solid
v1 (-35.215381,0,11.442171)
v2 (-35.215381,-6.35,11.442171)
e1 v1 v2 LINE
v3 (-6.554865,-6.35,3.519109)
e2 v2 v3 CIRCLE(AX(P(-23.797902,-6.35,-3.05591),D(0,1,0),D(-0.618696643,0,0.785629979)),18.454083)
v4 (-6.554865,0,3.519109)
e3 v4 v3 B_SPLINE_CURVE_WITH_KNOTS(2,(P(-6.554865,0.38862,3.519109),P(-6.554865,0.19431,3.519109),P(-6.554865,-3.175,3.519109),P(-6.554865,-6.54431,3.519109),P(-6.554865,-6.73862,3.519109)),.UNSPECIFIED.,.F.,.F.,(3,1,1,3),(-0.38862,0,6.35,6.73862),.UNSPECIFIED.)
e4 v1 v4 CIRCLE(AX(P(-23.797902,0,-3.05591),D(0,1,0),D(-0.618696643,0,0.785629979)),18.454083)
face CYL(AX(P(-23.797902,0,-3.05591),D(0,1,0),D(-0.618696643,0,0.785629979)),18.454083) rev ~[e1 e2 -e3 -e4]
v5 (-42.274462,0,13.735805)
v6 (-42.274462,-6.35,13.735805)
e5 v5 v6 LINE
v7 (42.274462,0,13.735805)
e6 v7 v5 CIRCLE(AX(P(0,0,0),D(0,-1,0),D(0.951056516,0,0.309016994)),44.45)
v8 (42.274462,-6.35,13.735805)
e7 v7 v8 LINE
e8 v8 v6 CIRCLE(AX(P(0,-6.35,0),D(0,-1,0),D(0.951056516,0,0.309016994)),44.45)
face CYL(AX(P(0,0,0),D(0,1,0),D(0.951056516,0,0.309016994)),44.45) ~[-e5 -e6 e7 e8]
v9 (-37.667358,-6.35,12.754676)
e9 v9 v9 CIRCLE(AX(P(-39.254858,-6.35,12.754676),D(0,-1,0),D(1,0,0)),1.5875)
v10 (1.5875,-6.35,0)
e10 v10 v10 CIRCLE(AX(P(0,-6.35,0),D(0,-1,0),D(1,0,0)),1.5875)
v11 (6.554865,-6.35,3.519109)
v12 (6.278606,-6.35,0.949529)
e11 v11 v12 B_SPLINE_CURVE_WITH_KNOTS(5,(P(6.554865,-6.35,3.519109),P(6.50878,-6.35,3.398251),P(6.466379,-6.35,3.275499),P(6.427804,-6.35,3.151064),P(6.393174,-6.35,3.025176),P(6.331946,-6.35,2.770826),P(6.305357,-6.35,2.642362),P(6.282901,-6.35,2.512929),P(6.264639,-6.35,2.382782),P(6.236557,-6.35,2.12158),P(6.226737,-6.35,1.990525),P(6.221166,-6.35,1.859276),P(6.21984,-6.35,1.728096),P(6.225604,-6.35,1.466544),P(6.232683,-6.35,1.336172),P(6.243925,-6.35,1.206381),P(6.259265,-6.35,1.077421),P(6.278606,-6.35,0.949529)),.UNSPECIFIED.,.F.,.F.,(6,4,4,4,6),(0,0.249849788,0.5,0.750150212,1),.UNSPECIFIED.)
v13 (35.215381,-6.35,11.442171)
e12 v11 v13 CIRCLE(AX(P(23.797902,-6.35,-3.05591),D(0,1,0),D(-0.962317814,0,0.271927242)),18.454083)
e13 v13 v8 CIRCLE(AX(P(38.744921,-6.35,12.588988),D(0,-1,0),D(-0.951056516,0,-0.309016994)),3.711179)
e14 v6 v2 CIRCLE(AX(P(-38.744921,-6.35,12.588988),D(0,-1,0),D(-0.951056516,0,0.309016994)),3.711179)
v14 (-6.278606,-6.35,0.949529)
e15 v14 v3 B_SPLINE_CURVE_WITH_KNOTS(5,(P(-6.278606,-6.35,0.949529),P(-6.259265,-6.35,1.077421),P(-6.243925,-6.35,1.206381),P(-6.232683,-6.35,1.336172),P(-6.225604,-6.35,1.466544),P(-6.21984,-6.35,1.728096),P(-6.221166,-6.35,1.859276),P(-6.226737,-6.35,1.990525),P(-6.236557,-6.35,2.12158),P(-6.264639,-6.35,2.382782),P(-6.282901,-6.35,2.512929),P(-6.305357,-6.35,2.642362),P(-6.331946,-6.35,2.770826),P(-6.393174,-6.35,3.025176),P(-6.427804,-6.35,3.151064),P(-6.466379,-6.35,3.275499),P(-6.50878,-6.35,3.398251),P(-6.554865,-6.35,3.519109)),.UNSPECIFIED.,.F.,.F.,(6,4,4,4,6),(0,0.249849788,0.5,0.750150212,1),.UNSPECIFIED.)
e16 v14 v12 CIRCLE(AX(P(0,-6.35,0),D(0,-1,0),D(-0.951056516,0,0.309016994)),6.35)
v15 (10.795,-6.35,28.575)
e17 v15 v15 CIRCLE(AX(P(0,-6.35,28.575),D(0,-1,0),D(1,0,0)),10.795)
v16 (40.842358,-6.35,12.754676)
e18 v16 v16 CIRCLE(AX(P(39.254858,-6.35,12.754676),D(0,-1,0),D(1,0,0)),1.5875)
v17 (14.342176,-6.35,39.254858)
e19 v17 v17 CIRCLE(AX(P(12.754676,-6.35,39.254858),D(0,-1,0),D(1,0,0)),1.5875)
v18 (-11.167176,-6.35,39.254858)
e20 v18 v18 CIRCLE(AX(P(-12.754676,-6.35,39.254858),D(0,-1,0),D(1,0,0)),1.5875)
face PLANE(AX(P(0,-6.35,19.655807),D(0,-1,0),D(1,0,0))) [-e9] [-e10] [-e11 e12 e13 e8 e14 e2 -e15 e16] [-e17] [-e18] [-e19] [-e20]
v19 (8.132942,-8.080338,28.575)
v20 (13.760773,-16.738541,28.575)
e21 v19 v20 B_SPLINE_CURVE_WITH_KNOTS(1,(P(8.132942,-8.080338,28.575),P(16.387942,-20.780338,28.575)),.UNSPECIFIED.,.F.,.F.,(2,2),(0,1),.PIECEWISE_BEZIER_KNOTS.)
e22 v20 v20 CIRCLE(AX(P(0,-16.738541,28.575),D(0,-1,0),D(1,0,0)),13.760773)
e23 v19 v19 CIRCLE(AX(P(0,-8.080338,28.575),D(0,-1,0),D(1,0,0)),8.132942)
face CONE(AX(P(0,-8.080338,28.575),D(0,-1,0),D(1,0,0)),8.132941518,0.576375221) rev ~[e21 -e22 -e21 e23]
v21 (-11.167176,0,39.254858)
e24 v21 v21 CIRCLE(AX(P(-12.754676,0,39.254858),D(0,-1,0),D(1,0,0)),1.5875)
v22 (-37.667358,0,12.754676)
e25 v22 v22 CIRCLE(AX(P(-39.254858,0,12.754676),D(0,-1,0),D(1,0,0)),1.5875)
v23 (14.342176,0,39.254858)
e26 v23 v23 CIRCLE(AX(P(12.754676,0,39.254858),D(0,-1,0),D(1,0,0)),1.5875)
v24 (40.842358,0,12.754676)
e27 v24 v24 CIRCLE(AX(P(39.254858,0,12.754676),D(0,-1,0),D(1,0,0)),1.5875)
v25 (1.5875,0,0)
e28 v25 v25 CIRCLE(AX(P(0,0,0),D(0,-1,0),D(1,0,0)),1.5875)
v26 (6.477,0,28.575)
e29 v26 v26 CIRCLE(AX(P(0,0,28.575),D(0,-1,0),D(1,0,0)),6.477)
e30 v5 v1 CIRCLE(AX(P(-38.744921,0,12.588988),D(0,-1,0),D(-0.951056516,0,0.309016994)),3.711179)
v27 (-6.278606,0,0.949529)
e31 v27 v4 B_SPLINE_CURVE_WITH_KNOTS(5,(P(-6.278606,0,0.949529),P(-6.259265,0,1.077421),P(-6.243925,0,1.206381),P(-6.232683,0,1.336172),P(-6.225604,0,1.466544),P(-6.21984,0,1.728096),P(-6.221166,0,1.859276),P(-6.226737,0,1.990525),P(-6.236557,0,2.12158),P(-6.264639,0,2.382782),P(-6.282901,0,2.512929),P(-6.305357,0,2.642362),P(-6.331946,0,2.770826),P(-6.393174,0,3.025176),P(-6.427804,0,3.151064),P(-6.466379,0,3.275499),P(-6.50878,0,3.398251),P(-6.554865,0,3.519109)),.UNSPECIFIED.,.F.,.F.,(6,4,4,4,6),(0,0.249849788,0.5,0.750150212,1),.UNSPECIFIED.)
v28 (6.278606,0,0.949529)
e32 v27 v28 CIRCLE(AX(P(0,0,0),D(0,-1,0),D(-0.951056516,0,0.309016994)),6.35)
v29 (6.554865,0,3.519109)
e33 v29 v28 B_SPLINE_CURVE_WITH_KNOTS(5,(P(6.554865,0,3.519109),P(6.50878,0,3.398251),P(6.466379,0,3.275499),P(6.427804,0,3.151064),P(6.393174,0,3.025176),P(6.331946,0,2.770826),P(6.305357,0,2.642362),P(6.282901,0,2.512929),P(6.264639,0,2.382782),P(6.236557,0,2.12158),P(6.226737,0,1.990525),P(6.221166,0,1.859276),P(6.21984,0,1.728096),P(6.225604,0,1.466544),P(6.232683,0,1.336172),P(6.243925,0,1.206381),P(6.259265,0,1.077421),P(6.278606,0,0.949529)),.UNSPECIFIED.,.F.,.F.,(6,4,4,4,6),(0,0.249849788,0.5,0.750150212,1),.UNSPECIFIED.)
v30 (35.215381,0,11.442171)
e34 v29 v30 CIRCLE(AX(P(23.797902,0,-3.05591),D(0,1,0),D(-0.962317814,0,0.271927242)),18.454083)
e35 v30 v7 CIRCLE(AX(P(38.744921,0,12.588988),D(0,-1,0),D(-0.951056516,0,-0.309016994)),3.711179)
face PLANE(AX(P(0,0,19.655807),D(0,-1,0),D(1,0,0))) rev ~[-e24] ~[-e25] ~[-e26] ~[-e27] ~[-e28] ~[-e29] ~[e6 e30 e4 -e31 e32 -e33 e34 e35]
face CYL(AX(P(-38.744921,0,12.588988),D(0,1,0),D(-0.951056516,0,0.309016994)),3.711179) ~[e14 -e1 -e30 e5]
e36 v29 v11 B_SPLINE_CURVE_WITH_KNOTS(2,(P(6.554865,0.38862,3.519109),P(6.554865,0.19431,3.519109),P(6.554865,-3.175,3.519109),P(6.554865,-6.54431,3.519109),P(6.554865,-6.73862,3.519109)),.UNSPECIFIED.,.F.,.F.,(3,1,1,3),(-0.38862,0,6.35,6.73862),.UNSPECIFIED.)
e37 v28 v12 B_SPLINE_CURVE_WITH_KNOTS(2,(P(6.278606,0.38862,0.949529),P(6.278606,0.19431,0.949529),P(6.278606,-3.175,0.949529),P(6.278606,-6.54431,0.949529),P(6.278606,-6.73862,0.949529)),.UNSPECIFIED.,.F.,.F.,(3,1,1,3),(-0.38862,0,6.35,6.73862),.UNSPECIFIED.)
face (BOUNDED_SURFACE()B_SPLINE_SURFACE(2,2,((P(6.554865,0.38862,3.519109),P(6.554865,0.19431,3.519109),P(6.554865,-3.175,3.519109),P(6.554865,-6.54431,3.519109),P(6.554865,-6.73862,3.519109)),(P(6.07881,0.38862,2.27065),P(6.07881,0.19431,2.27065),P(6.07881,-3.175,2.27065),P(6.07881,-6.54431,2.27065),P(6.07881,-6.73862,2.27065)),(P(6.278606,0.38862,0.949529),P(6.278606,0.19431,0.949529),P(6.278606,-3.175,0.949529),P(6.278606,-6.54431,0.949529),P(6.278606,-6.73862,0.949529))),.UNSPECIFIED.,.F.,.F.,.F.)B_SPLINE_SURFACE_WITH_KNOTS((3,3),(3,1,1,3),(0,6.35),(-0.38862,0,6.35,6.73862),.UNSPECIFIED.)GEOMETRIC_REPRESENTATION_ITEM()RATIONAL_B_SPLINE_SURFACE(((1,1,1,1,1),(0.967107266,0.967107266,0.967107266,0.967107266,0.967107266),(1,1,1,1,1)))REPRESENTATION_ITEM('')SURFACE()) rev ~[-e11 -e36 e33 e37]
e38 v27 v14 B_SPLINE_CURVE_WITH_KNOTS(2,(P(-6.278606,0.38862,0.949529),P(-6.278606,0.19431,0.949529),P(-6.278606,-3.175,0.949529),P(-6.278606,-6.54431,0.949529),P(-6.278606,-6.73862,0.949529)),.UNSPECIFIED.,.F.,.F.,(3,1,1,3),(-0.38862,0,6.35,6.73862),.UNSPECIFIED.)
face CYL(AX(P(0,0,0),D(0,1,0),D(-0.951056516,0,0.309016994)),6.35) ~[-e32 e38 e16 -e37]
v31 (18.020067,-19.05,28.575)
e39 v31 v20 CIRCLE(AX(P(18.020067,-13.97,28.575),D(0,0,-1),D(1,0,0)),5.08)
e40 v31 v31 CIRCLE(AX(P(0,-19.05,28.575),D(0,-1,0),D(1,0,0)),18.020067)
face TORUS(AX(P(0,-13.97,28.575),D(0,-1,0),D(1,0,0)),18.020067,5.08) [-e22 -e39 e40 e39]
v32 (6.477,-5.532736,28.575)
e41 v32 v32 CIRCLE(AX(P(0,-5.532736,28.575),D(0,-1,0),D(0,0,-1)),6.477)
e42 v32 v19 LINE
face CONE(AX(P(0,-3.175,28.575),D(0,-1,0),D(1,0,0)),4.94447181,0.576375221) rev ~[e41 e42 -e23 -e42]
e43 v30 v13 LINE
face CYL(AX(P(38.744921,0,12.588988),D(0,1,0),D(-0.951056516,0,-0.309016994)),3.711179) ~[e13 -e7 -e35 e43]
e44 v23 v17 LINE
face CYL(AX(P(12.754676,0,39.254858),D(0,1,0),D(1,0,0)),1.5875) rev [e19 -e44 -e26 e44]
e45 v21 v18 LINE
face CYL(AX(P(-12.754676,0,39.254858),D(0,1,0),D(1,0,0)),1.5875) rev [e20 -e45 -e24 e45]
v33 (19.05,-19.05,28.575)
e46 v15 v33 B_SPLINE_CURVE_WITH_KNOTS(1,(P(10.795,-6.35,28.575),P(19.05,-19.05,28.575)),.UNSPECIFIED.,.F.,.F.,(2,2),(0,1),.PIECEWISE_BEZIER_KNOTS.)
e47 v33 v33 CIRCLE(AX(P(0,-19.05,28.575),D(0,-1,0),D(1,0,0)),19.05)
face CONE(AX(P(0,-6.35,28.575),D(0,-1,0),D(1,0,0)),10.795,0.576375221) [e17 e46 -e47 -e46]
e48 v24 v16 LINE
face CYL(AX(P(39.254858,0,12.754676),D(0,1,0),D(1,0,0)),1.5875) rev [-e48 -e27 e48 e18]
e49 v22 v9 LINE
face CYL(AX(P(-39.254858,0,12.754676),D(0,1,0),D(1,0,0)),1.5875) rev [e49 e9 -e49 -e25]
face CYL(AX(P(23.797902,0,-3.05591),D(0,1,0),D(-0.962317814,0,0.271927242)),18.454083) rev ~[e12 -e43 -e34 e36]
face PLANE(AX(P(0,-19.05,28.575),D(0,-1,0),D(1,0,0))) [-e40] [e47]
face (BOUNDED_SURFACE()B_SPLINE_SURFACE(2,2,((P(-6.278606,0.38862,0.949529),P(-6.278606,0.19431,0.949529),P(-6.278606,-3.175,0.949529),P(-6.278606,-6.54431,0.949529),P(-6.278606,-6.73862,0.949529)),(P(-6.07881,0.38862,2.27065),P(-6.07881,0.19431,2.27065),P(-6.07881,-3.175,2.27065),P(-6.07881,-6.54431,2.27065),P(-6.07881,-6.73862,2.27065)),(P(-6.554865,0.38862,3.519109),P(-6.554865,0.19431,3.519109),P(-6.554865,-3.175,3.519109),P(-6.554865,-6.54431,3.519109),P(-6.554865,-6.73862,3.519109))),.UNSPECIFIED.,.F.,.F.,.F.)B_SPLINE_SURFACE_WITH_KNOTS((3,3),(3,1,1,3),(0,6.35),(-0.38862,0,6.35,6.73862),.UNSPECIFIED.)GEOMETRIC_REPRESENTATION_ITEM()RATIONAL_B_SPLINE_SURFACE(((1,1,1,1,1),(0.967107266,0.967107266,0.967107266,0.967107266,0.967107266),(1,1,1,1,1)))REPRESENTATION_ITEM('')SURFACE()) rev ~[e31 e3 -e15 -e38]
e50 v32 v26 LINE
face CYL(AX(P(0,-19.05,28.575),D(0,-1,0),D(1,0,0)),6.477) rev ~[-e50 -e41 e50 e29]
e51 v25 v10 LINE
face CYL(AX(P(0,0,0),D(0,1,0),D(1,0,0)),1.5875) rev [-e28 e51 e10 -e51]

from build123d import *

# Parameters (mm, degrees)
F0_R        = 1.5875
F1_DEPTH    = 6.35
F2_R        = 10.795
F4_R        = 19.05
F6_T        = 3.175
F6_T3_DEPTH = 12.7
F7_R        = 6.477
F8_DEPTH    = 19.051
F9_R        = 5.08


# Not quite as in the source:
# - two fillets or chamfers of one size are made in one step
# - a shell that OpenCascade refuses in one call is made with other operations: the cavity is built on its own and cut out


with BuildPart() as f1:
    # F0 (on Front) → F1 (new body)
    with BuildSketch(Plane.XZ):
        with BuildLine():
            ThreePointArc((35.2153805779, 11.4421707601), (39.8917386836, 9.0594472943), (42.2744621493, 13.7358054))
            ThreePointArc((42.2744621493, 13.7358054), (0, 44.45), (-42.2744621493, 13.7358054))
            ThreePointArc((-42.2744621493, 13.7358054), (-39.8917386836, 9.0594472943), (-35.2153805779, 11.4421707601))
            ThreePointArc((-35.2153805779, 11.4421707601), (-18.0952762982, 14.4949657749), (-6.0392088785, 1.9622579143))
            ThreePointArc((-6.0392088785, 1.9622579143), (0, -6.35), (6.0392088785, 1.9622579143))
            ThreePointArc((6.0392088785, 1.9622579143), (18.0952762982, 14.4949657749), (35.2153805779, 11.4421707601))
        make_face()
        Circle(F0_R, mode=Mode.SUBTRACT)
        with Locations((-39.2548577101, 12.7546764428)):
            Circle(F0_R, mode=Mode.SUBTRACT)
        with Locations((39.2548577101, 12.7546764428)):
            Circle(F0_R, mode=Mode.SUBTRACT)
        with Locations((-12.7546764428, 39.2548577101)):
            Circle(F0_R, mode=Mode.SUBTRACT)
        with Locations((12.7546764428, 39.2548577101)):
            Circle(F0_R, mode=Mode.SUBTRACT)
    extrude(amount=F1_DEPTH)

    # F2 (on face) → F5 section 0
    with BuildSketch(Plane.XZ.offset(6.35)):
        with Locations((0, 28.575)):
            Circle(F2_R)
    # F4 (on offset) → F5 section 1
    with BuildSketch(Plane.XZ.offset(19.05)):
        with Locations((0, 28.575)):
            Circle(F4_R)
    loft()

    # F6: shell of thickness 3.175, made by hand


with BuildPart() as f6_core1:
    # F6_t2: copy of F1
    add(f1.part)

    # the walls: a layer under each face that stays
    f6_faces = [f6_core1.faces().sort_by_distance(p)[0] for p in [
        (18.0952762982, -3.175, 14.4949657749),
        (0, -3.175, -6.35),
        (39.8917386836, -3.175, 9.0594472943),
        (0, 0, 19.05),
        (-28.3040667791, -6.35, 19.05),
        (-18.0952762982, -3.175, 14.4949657749),
        (0, -3.175, 44.45),
        (-39.8917386836, -3.175, 9.0594472943),
        (-1.5875, -3.175, 0),
        (-40.8423577101, -3.175, 12.7546764428),
        (37.6673577101, -3.175, 12.7546764428),
        (-14.3421764428, -3.175, 39.2548577101),
        (11.1671764428, -3.175, 39.2548577101),
        (-14.9225, -12.7, 28.575),
    ]]
    thicken(f6_faces, amount=-F6_T, mode=Mode.SUBTRACT)

    # F6_s4 → F6_t3 (cut)
    with BuildSketch(Plane.XZ.offset(-3.175)):
        Polygon((6.0999585135, 1.9634355139), (2.9838498192, 2.8256269079), (2.7217112336, 1.8979499721), (3.0196044392, 0.9811289571), align=None)
        Polygon((35.1655409151, 11.4074157187), (37.179742419, 13.9365459438), (37.9370918115, 13.3401207322), (38.2349850172, 12.4232997172), align=None)
        Polygon((-6.0999585135, 1.9634355139), (-3.0196044392, 0.9811289571), (-2.7217112336, 1.8979499721), (-2.9838498192, 2.8256269079), align=None)
        Polygon((-35.1655409151, 11.4074157187), (-37.179742419, 13.9365459438), (-37.9370918115, 13.3401207322), (-38.2349850172, 12.4232997172), align=None)
    extrude(amount=F6_T3_DEPTH, mode=Mode.SUBTRACT)

    # F6_s5 → F6_t6 (revolve, cut)
    with BuildSketch(Plane.XY.offset(28.575)):
        Polygon((10.8216205848, -6.3644466199), (10.795, -3.175), (4.9444718097, -3.175), (8.1329415182, -8.0803380131), align=None)
    revolve(axis=Axis((0, -6.35, 28.575), (0, -1, 0)), mode=Mode.SUBTRACT)


with BuildPart() as f1_1:
    add(f1.part)

    # what is left inside the walls is the cavity
    f6_cavity = [f6_core1.part.solids().sort_by_distance(p)[0] for p in [
        (-10.483081, -11.754195, 28.575),
    ]]
    add(f6_cavity, mode=Mode.SUBTRACT)

    # F7 (on face) → F8 (cut, through all)
    with BuildSketch(Plane.XZ.offset(19.05)):
        with Locations((0, 28.575)):
            Circle(F7_R)
    extrude(amount=-F8_DEPTH, mode=Mode.SUBTRACT)

    # F9
    f9_edges = [f1_1.edges().sort_by_distance(p)[0] for p in [
        (6.039209, -3.175, 1.962258),
        (-6.039209, -3.175, 1.962258),
        (-15.263222, -19.05, 28.575),
    ]]
    fillet(f9_edges, radius=F9_R)


solid = f1_1.part
